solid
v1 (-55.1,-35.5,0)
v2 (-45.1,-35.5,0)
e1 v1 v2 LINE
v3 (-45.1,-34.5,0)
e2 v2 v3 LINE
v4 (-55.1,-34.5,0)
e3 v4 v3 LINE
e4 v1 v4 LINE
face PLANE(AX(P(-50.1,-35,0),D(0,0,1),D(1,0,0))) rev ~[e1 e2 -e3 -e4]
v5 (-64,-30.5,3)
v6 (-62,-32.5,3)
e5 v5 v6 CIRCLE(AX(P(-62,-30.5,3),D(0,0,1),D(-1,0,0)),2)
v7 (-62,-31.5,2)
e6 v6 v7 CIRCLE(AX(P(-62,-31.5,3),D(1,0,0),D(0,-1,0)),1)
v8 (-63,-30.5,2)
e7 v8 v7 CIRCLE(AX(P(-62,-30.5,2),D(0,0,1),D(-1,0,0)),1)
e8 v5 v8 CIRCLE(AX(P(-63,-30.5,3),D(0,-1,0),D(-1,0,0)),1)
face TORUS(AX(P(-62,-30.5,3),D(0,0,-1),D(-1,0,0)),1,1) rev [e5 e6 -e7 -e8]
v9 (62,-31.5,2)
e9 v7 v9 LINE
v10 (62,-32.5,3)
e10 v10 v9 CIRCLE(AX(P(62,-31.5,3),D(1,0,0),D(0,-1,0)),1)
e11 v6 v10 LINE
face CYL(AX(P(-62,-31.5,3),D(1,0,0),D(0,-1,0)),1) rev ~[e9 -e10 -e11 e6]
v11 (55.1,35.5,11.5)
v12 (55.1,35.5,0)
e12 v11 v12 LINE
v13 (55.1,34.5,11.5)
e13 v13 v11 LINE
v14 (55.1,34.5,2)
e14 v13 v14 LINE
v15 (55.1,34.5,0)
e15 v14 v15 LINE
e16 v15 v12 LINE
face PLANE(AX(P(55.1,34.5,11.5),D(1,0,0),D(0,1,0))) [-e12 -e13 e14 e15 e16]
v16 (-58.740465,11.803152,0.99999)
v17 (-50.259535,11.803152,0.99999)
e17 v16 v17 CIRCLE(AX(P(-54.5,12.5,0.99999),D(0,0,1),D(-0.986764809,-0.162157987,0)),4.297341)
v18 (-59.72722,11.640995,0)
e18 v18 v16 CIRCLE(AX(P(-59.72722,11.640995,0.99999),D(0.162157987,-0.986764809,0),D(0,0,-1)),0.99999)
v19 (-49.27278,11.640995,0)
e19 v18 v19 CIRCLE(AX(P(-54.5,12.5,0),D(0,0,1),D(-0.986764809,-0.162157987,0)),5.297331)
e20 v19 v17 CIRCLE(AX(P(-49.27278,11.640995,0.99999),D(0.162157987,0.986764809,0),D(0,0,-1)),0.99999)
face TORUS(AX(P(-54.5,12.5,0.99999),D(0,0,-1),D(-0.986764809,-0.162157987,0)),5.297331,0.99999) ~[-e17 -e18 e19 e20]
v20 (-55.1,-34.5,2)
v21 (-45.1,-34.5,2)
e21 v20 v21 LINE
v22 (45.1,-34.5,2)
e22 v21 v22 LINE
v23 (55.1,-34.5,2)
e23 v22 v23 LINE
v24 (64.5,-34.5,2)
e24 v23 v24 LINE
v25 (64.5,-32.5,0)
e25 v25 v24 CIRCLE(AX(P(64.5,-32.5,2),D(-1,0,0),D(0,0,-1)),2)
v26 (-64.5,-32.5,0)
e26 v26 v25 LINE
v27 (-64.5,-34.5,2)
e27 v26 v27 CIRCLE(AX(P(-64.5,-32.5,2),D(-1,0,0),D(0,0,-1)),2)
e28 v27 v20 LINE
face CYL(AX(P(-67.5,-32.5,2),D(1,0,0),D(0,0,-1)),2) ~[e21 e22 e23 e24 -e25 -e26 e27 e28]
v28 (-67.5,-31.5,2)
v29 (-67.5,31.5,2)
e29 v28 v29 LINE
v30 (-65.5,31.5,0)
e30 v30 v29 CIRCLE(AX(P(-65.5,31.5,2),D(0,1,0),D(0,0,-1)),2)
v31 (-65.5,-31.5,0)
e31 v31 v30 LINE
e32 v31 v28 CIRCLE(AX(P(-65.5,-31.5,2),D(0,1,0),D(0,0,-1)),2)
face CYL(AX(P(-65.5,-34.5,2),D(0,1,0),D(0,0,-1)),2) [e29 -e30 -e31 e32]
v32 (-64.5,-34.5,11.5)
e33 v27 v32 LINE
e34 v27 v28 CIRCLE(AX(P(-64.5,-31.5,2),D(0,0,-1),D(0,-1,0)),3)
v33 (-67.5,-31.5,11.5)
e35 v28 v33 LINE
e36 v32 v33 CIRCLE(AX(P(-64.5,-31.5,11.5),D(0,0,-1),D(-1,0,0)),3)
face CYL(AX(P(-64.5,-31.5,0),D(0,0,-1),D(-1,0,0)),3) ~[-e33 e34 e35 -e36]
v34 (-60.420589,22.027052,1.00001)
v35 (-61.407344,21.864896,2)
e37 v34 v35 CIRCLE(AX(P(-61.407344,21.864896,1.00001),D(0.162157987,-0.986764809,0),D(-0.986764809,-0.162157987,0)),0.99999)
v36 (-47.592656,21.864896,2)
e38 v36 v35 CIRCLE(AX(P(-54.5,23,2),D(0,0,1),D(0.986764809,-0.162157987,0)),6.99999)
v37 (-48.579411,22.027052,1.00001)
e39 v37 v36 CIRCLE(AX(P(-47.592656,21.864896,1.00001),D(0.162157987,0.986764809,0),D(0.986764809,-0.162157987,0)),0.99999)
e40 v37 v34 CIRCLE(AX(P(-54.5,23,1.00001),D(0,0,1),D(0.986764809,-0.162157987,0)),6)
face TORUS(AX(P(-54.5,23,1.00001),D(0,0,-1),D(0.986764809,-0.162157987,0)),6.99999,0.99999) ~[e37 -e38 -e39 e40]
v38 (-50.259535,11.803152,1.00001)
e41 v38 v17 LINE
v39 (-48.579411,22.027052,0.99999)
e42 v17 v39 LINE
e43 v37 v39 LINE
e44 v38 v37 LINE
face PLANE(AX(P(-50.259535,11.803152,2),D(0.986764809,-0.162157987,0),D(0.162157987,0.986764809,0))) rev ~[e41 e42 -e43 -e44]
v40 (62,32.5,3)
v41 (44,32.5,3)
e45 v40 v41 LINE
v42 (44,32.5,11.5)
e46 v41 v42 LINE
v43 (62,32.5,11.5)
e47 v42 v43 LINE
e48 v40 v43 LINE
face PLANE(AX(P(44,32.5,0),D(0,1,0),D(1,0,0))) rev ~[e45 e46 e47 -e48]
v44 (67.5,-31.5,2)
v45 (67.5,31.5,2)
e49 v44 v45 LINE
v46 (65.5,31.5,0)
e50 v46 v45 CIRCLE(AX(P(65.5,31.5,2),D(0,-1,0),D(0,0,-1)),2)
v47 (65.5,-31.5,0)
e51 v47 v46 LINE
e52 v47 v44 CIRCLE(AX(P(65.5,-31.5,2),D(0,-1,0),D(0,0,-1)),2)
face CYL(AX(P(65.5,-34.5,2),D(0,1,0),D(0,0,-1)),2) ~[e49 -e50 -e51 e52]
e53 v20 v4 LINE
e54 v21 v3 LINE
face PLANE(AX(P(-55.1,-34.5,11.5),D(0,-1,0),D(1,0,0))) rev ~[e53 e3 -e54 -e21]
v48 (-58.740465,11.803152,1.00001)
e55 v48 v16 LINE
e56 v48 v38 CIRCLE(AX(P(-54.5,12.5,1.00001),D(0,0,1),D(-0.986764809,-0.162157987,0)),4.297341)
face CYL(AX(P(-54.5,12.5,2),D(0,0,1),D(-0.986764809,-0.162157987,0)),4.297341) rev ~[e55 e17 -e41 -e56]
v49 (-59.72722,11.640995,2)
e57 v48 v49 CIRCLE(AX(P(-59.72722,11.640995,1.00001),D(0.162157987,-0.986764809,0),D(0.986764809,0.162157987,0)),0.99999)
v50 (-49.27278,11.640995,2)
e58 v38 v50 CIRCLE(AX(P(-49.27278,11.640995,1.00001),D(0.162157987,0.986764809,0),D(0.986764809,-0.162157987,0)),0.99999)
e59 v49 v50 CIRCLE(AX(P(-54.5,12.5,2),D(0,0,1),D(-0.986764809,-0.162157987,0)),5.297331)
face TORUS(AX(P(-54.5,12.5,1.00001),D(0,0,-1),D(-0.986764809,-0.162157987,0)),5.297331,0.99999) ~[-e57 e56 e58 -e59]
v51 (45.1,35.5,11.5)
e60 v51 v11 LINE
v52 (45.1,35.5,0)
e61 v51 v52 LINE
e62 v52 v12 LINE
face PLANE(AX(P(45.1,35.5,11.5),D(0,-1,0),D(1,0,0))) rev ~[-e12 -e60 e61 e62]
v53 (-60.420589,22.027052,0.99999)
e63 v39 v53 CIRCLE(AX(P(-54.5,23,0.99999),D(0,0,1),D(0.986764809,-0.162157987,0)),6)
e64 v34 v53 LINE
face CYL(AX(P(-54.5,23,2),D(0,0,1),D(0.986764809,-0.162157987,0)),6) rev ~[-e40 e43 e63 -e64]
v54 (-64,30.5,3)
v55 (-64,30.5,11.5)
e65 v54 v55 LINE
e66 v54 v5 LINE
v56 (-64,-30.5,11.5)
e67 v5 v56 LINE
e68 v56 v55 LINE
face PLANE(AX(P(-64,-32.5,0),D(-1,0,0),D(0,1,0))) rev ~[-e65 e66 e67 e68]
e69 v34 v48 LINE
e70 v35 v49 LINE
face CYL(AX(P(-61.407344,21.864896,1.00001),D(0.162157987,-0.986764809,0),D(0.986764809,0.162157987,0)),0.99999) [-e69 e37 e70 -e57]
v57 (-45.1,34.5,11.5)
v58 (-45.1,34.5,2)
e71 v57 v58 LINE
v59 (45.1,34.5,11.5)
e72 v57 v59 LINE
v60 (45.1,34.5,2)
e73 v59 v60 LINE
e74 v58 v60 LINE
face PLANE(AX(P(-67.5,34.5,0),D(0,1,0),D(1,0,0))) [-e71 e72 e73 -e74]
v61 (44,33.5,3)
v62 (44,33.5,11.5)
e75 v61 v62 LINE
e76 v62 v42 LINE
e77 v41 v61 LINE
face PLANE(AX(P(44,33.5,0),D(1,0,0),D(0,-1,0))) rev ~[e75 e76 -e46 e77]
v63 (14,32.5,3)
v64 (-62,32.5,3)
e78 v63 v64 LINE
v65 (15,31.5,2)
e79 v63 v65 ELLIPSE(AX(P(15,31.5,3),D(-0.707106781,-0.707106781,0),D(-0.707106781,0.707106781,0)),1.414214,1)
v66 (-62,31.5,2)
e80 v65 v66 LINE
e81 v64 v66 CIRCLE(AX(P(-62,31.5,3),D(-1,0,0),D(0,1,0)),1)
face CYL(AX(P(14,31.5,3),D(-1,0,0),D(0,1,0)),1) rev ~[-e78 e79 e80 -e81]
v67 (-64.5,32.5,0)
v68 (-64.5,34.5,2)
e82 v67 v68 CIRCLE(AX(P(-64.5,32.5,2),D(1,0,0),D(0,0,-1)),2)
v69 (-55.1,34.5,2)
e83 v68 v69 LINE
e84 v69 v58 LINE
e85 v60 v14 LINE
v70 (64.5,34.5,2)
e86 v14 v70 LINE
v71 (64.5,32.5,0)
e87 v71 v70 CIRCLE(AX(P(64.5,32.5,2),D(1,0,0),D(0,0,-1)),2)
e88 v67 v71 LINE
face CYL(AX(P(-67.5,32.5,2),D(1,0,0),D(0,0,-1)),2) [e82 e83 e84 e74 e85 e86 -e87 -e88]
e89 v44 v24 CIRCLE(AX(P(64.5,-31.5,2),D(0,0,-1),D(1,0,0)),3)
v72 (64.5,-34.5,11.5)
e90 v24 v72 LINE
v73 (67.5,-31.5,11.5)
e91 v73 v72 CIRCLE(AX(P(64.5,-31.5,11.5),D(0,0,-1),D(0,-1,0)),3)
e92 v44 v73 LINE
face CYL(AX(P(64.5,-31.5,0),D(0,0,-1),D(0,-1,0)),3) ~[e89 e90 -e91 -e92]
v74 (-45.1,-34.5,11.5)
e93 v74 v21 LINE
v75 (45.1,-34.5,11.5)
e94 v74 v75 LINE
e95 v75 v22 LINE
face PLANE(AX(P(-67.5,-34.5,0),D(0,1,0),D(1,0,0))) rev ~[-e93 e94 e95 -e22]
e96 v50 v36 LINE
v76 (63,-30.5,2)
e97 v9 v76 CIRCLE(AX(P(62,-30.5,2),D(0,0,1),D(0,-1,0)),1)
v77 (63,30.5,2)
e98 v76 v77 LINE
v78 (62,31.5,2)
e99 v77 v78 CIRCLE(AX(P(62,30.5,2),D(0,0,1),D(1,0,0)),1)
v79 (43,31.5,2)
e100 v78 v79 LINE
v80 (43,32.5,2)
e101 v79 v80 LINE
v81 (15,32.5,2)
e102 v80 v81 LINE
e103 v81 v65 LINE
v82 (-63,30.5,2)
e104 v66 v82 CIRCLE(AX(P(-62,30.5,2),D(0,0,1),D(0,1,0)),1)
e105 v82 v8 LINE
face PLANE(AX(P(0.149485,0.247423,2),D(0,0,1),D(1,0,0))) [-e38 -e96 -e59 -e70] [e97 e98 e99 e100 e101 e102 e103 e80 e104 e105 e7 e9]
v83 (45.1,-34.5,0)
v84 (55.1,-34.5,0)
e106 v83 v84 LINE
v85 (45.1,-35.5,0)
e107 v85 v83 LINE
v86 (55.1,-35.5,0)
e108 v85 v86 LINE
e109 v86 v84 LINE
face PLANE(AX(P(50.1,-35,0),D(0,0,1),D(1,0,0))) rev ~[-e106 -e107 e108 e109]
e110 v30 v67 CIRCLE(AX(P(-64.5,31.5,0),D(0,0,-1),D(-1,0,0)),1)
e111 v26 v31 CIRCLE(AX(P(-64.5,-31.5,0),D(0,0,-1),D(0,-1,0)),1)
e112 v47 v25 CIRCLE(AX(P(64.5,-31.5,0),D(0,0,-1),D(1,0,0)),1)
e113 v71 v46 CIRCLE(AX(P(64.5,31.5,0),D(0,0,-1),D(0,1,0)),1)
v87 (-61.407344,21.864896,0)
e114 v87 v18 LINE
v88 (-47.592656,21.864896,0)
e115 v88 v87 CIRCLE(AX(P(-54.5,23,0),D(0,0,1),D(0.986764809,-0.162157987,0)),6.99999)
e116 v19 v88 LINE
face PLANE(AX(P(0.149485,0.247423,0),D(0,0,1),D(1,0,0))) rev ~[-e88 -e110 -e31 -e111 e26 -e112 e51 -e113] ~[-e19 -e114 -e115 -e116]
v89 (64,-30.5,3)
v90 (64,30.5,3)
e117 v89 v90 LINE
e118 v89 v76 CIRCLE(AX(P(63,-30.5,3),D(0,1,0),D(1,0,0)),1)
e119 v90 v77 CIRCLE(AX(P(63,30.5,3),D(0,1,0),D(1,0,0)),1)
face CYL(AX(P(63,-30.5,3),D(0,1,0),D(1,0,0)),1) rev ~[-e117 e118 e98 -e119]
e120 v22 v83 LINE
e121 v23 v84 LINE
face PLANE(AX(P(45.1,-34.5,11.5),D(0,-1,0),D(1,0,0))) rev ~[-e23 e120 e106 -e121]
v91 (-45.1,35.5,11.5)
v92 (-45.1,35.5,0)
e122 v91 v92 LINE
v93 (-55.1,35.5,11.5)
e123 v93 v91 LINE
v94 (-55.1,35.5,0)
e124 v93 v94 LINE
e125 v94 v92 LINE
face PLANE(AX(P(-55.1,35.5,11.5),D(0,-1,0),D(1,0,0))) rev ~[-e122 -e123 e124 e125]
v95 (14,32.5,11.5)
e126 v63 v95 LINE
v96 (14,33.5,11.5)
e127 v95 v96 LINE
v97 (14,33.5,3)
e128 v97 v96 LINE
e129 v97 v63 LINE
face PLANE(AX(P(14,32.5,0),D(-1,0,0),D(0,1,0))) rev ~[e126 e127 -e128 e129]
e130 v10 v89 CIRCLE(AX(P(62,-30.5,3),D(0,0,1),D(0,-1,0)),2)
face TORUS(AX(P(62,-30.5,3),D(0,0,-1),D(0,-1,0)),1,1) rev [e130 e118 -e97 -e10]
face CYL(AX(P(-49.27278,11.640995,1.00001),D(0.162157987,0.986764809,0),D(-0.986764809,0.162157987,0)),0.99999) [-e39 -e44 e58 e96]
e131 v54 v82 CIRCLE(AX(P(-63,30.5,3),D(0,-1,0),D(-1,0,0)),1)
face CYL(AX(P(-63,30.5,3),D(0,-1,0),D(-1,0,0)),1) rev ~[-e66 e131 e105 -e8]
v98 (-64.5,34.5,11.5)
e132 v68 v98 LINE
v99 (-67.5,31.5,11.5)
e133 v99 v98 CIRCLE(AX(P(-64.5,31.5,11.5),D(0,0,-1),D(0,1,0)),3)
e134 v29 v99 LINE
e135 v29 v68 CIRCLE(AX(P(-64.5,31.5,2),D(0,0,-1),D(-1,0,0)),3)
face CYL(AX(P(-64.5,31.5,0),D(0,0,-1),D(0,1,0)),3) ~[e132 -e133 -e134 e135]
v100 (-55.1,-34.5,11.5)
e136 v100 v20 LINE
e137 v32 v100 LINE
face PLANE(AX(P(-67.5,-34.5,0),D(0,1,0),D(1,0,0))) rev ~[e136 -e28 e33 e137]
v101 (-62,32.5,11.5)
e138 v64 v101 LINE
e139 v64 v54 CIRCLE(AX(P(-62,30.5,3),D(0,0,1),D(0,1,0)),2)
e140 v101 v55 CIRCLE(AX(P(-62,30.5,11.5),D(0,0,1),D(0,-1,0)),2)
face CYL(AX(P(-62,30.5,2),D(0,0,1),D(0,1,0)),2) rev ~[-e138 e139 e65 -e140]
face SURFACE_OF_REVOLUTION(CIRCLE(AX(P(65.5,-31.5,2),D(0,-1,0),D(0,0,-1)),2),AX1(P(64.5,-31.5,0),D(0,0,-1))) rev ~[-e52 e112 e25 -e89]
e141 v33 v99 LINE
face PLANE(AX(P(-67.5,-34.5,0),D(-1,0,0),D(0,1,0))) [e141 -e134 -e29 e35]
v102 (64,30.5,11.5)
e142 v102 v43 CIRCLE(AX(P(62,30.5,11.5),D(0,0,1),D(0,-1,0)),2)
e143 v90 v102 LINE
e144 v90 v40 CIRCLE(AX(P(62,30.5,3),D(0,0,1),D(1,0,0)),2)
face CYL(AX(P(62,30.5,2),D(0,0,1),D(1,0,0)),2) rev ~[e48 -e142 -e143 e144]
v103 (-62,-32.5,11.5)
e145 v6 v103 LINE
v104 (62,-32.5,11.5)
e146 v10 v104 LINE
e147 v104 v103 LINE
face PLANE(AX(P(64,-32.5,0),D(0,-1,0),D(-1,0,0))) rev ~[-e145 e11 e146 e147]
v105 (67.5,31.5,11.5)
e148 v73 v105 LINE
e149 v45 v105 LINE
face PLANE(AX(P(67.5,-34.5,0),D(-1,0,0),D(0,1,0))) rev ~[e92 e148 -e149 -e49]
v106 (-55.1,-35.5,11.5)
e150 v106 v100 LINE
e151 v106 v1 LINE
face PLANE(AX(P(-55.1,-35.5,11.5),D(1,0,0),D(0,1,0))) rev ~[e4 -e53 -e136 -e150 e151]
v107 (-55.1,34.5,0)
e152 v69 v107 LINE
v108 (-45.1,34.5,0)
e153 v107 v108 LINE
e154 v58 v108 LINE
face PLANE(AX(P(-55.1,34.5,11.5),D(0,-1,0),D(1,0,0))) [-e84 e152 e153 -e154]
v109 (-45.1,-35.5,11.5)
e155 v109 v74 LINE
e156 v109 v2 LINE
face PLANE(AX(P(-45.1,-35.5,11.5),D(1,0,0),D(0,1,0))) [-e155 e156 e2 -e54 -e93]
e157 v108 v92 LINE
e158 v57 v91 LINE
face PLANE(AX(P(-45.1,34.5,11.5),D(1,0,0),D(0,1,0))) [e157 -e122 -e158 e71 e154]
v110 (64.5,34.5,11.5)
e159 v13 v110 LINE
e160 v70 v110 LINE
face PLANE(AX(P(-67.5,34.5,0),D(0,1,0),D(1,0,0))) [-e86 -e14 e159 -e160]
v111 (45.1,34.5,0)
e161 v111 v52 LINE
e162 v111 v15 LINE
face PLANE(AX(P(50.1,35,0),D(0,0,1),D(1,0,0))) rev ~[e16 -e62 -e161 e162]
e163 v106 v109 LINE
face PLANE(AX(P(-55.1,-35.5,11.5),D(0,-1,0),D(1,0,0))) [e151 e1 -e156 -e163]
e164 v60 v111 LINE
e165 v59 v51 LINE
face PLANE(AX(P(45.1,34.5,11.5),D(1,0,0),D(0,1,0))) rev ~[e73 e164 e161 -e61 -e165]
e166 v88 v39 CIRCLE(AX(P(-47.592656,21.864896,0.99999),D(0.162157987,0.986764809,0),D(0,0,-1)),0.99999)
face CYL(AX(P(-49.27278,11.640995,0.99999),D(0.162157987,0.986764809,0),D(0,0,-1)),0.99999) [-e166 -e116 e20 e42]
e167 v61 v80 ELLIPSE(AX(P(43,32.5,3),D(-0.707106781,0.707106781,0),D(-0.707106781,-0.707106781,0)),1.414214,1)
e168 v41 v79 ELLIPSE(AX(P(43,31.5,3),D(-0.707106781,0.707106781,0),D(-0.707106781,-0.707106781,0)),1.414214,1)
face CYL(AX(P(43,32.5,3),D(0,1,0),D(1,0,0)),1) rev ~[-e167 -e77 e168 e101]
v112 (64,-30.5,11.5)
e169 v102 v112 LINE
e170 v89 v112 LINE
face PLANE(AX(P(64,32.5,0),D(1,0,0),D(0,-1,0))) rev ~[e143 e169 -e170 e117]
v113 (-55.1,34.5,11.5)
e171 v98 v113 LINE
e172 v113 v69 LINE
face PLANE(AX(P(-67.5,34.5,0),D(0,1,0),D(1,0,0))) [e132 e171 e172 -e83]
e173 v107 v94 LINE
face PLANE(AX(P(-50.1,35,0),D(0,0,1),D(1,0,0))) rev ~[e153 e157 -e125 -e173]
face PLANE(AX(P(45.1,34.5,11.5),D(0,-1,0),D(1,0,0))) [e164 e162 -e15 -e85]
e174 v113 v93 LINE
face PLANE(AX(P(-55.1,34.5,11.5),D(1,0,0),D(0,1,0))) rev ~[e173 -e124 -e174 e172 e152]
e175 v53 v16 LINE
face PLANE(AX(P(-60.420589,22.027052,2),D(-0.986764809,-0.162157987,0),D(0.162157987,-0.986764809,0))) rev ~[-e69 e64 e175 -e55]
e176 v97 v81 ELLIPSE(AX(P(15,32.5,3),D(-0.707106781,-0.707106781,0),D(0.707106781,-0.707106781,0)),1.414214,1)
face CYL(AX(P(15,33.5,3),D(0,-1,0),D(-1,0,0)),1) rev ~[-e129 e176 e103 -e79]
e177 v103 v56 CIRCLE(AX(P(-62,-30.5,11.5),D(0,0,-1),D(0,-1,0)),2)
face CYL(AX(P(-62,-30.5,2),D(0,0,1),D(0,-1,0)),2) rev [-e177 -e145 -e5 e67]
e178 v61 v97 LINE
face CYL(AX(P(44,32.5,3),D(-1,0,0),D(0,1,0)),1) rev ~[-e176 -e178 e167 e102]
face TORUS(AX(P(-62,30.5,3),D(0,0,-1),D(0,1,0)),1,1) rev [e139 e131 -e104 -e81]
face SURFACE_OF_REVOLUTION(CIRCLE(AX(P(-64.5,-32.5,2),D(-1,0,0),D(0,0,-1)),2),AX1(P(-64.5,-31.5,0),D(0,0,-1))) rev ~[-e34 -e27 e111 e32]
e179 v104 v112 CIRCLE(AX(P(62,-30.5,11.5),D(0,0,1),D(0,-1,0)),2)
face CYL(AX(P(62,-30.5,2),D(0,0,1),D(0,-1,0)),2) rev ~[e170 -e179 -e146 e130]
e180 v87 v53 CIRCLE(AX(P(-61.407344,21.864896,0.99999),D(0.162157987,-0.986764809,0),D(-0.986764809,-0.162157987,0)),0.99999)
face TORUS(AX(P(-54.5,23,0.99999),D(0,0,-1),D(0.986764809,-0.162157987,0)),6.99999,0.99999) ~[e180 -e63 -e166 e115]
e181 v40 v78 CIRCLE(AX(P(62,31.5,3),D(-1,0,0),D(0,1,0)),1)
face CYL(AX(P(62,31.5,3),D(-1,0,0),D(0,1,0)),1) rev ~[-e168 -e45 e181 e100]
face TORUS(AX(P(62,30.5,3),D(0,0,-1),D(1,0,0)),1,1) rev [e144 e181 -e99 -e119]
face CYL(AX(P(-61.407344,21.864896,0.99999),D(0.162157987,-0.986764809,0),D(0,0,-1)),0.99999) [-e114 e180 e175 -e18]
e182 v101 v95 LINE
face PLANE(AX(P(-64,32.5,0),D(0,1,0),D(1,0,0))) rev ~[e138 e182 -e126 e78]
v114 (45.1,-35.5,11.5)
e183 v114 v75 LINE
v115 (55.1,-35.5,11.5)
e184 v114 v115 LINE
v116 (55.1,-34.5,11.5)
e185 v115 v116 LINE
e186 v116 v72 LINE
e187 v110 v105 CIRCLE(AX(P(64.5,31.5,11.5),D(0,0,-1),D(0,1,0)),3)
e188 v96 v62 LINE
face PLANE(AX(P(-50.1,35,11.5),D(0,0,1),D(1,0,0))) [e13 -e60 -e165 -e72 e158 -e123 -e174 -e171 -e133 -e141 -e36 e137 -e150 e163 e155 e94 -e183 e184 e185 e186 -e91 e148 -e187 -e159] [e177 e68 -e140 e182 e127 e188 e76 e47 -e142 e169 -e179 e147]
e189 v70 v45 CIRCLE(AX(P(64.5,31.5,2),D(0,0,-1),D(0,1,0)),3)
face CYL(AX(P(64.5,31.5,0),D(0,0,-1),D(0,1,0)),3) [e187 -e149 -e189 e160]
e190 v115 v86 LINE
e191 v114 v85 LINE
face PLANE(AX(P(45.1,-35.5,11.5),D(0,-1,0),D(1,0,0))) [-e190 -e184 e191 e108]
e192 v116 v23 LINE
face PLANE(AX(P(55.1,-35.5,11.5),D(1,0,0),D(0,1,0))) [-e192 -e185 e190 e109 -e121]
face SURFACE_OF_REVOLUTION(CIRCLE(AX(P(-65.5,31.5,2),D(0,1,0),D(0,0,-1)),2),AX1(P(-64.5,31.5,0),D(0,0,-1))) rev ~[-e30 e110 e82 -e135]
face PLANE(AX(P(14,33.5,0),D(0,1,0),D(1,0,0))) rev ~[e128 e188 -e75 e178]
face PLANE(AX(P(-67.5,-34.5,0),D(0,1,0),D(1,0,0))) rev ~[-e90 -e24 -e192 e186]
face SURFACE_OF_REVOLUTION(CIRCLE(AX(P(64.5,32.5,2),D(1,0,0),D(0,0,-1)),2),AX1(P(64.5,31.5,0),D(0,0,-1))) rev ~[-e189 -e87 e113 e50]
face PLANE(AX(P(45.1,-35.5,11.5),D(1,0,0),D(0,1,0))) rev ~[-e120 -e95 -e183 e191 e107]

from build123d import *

# Parameters (mm, degrees)
F0_W         = 135
F0_H         = 69
F1_DEPTH     = 11.5
F2_DEPTH     = 2
F3_R         = 2
F4_R         = 2
F5_R         = 1
F6_T1_DEPTH  = 19
F6_T4_ANGLE  = 90
F6_T6_ANGLE  = 90
F6_T8_ANGLE  = 90
F6_T10_ANGLE = 90
F7_W         = 10
F7_H         = 1
F8_DEPTH     = 11.5
F10_DEPTH    = 25
F11_R        = 0.99999


# Not quite as in the source:
# - a fillet or chamfer that OpenCascade refuses, or shapes differently, is made with other operations: its cross-section is extruded or revolved along the edge and cut away or added
# - a fillet or chamfer is up to 0.001 mm smaller than in the source, because OpenCascade refuses the exact size
# - a feature of the source that left no trace in its solid (it failed there, or was rolled back) is left out


with BuildPart() as f1:
    # F0 (on Top) → F1 (new body)
    with BuildSketch(Plane.XY):
        Rectangle(F0_W, F0_H)
        Polygon((-64, -32.5), (-64, 32.5), (14, 32.5), (14, 33.5), (44, 33.5), (44, 32.5), (64, 32.5), (64, -32.5), align=None, mode=Mode.SUBTRACT)
    extrude(amount=F1_DEPTH)

    # F0 (on Top) → F2 (join)
    with BuildSketch(Plane.XY):
        Polygon((14, 32.5), (-64, 32.5), (-64, -32.5), (64, -32.5), (64, 32.5), (44, 32.5), (44, 33.5), (14, 33.5), align=None)
    extrude(amount=F2_DEPTH)

    # F3
    f3_edges = [f1.edges().sort_by_distance(p)[0] for p in [
        (0, 34.5, 0),
        (-67.5, 0, 0),
        (0, -34.5, 0),
        (67.5, 0, 0),
    ]]
    fillet(f3_edges, radius=F3_R)

    # F4
    f4_edges = [f1.edges().sort_by_distance(p)[0] for p in [
        (-64, 32.5, 6.75),
        (64, 32.5, 6.75),
        (64, -32.5, 6.75),
        (-64, -32.5, 6.75),
    ]]
    fillet(f4_edges, radius=F4_R)

    # F5
    f5_edges = [f1.edges().sort_by_distance(p)[0] for p in [
        (-24, 32.5, 2),
        (-63.414214, 31.914214, 2),
        (14, 33, 2),
        (-64, 0, 2),
        (29, 33.5, 2),
        (-63.414214, -31.914214, 2),
        (44, 33, 2),
        (0, -32.5, 2),
        (53, 32.5, 2),
        (63.414214, -31.914214, 2),
        (63.414214, 31.914214, 2),
        (64, 0, 2),
    ]]
    fillet(f5_edges, radius=F5_R)

    # F6: fillet of radius 3 on 4 edges, made by hand

    # F6_s2 → F6_t1 (cut)
    with BuildSketch(Plane.XY):
        with BuildLine():
            ThreePointArc((-64.5, 34.5), (-66.6213203436, 33.6213203436), (-67.5, 31.5))
            Line((-67.5, 31.5), (-67.5, 34.5))
            Line((-67.5, 34.5), (-64.5, 34.5))
        make_face()
        with BuildLine():
            ThreePointArc((-67.5, -31.5), (-66.6213203436, -33.6213203436), (-64.5, -34.5))
            Line((-64.5, -34.5), (-67.5, -34.5))
            Line((-67.5, -34.5), (-67.5, -31.5))
        make_face()
        with BuildLine():
            ThreePointArc((64.5, -34.5), (66.6213203436, -33.6213203436), (67.5, -31.5))
            Line((67.5, -31.5), (67.5, -34.5))
            Line((67.5, -34.5), (64.5, -34.5))
        make_face()
        with BuildLine():
            ThreePointArc((64.5, 34.5), (66.6213203436, 33.6213203436), (67.5, 31.5))
            Line((67.5, 31.5), (67.5, 34.5))
            Line((67.5, 34.5), (64.5, 34.5))
        make_face()
    extrude(amount=F6_T1_DEPTH, mode=Mode.SUBTRACT)

    # F6_s3 → F6_t4 (revolve, cut)
    with BuildSketch(Plane.YZ.offset(64.5)):
        with BuildLine():
            ThreePointArc((32.5, 0), (33.9142135624, 0.5857864376), (34.5, 2))
            Line((34.5, 2), (34.5, 0))
            Line((34.5, 0), (32.5, 0))
        make_face()
    revolve(axis=Axis((64.5, 31.5, 0), (0, 0, -1)), revolution_arc=F6_T4_ANGLE, mode=Mode.SUBTRACT)

    # F6_s5 → F6_t6 (revolve, cut)
    with BuildSketch(Plane.XZ.offset(31.5)):
        with BuildLine():
            ThreePointArc((65.5, 0), (66.9142135624, 0.5857864376), (67.5, 2))
            Line((67.5, 2), (67.5, 0))
            Line((67.5, 0), (65.5, 0))
        make_face()
    revolve(axis=Axis((64.5, -31.5, 0), (0, 0, -1)), revolution_arc=F6_T6_ANGLE, mode=Mode.SUBTRACT)

    # F6_s7 → F6_t8 (revolve, cut)
    with BuildSketch(Plane.YZ.offset(-64.5)):
        with BuildLine():
            ThreePointArc((-32.5, 0), (-33.9142135624, 0.5857864376), (-34.5, 2))
            Line((-34.5, 2), (-34.5, 0))
            Line((-34.5, 0), (-32.5, 0))
        make_face()
    revolve(axis=Axis((-64.5, -31.5, 0), (0, 0, -1)), revolution_arc=F6_T8_ANGLE, mode=Mode.SUBTRACT)

    # F6_s9 → F6_t10 (revolve, cut)
    with BuildSketch(Plane.XZ.offset(-31.5)):
        with BuildLine():
            ThreePointArc((-65.5, 0), (-66.9142135624, 0.5857864376), (-67.5, 2))
            Line((-67.5, 2), (-67.5, 0))
            Line((-67.5, 0), (-65.5, 0))
        make_face()
    revolve(axis=Axis((-64.5, 31.5, 0), (0, 0, -1)), revolution_arc=F6_T10_ANGLE, mode=Mode.SUBTRACT)

    # F7 (on face) → F8 (join, through all)
    with BuildSketch(Plane.XY.offset(11.5)):
        with Locations((-50.1, 35)):
            Rectangle(F7_W, F7_H)
        with Locations((50.1, 35)):
            Rectangle(F7_W, F7_H)
        with Locations((-50.1, -35)):
            Rectangle(F7_W, F7_H)
        with Locations((50.1, -35)):
            Rectangle(F7_W, F7_H)
    extrude(amount=-F8_DEPTH)

    # F9 (on face) → F10 (cut)
    with BuildSketch(Plane.XY.offset(2)):
        with BuildLine():
            Line((-50.2595349939, 11.8031518124), (-48.5794111489, 22.0270520794))
            ThreePointArc((-48.5794111489, 22.0270520794), (-54.5, 29), (-60.4205888511, 22.0270520794))
            Line((-60.4205888511, 22.0270520794), (-58.7404650061, 11.8031518124))
            ThreePointArc((-58.7404650061, 11.8031518124), (-54.5, 8.2026588611), (-50.2595349939, 11.8031518124))
        make_face()
    extrude(amount=-F10_DEPTH, mode=Mode.SUBTRACT)

    # F11 (radius 1 in the source; OpenCascade refuses exactly that, so slightly less here)
    f11_edges = [f1.edges().sort_by_distance(p)[0] for p in [
        (-54.5, 29, 2),
        (-49.419473, 16.915102, 0),
        (-54.5, 8.202659, 2),
        (-49.419473, 16.915102, 2),
        (-59.580527, 16.915102, 2),
        (-54.5, 8.202659, 0),
        (-54.5, 29, 0),
        (-59.580527, 16.915102, 0),
    ]]
    fillet(f11_edges, radius=F11_R)


solid = f1.part
